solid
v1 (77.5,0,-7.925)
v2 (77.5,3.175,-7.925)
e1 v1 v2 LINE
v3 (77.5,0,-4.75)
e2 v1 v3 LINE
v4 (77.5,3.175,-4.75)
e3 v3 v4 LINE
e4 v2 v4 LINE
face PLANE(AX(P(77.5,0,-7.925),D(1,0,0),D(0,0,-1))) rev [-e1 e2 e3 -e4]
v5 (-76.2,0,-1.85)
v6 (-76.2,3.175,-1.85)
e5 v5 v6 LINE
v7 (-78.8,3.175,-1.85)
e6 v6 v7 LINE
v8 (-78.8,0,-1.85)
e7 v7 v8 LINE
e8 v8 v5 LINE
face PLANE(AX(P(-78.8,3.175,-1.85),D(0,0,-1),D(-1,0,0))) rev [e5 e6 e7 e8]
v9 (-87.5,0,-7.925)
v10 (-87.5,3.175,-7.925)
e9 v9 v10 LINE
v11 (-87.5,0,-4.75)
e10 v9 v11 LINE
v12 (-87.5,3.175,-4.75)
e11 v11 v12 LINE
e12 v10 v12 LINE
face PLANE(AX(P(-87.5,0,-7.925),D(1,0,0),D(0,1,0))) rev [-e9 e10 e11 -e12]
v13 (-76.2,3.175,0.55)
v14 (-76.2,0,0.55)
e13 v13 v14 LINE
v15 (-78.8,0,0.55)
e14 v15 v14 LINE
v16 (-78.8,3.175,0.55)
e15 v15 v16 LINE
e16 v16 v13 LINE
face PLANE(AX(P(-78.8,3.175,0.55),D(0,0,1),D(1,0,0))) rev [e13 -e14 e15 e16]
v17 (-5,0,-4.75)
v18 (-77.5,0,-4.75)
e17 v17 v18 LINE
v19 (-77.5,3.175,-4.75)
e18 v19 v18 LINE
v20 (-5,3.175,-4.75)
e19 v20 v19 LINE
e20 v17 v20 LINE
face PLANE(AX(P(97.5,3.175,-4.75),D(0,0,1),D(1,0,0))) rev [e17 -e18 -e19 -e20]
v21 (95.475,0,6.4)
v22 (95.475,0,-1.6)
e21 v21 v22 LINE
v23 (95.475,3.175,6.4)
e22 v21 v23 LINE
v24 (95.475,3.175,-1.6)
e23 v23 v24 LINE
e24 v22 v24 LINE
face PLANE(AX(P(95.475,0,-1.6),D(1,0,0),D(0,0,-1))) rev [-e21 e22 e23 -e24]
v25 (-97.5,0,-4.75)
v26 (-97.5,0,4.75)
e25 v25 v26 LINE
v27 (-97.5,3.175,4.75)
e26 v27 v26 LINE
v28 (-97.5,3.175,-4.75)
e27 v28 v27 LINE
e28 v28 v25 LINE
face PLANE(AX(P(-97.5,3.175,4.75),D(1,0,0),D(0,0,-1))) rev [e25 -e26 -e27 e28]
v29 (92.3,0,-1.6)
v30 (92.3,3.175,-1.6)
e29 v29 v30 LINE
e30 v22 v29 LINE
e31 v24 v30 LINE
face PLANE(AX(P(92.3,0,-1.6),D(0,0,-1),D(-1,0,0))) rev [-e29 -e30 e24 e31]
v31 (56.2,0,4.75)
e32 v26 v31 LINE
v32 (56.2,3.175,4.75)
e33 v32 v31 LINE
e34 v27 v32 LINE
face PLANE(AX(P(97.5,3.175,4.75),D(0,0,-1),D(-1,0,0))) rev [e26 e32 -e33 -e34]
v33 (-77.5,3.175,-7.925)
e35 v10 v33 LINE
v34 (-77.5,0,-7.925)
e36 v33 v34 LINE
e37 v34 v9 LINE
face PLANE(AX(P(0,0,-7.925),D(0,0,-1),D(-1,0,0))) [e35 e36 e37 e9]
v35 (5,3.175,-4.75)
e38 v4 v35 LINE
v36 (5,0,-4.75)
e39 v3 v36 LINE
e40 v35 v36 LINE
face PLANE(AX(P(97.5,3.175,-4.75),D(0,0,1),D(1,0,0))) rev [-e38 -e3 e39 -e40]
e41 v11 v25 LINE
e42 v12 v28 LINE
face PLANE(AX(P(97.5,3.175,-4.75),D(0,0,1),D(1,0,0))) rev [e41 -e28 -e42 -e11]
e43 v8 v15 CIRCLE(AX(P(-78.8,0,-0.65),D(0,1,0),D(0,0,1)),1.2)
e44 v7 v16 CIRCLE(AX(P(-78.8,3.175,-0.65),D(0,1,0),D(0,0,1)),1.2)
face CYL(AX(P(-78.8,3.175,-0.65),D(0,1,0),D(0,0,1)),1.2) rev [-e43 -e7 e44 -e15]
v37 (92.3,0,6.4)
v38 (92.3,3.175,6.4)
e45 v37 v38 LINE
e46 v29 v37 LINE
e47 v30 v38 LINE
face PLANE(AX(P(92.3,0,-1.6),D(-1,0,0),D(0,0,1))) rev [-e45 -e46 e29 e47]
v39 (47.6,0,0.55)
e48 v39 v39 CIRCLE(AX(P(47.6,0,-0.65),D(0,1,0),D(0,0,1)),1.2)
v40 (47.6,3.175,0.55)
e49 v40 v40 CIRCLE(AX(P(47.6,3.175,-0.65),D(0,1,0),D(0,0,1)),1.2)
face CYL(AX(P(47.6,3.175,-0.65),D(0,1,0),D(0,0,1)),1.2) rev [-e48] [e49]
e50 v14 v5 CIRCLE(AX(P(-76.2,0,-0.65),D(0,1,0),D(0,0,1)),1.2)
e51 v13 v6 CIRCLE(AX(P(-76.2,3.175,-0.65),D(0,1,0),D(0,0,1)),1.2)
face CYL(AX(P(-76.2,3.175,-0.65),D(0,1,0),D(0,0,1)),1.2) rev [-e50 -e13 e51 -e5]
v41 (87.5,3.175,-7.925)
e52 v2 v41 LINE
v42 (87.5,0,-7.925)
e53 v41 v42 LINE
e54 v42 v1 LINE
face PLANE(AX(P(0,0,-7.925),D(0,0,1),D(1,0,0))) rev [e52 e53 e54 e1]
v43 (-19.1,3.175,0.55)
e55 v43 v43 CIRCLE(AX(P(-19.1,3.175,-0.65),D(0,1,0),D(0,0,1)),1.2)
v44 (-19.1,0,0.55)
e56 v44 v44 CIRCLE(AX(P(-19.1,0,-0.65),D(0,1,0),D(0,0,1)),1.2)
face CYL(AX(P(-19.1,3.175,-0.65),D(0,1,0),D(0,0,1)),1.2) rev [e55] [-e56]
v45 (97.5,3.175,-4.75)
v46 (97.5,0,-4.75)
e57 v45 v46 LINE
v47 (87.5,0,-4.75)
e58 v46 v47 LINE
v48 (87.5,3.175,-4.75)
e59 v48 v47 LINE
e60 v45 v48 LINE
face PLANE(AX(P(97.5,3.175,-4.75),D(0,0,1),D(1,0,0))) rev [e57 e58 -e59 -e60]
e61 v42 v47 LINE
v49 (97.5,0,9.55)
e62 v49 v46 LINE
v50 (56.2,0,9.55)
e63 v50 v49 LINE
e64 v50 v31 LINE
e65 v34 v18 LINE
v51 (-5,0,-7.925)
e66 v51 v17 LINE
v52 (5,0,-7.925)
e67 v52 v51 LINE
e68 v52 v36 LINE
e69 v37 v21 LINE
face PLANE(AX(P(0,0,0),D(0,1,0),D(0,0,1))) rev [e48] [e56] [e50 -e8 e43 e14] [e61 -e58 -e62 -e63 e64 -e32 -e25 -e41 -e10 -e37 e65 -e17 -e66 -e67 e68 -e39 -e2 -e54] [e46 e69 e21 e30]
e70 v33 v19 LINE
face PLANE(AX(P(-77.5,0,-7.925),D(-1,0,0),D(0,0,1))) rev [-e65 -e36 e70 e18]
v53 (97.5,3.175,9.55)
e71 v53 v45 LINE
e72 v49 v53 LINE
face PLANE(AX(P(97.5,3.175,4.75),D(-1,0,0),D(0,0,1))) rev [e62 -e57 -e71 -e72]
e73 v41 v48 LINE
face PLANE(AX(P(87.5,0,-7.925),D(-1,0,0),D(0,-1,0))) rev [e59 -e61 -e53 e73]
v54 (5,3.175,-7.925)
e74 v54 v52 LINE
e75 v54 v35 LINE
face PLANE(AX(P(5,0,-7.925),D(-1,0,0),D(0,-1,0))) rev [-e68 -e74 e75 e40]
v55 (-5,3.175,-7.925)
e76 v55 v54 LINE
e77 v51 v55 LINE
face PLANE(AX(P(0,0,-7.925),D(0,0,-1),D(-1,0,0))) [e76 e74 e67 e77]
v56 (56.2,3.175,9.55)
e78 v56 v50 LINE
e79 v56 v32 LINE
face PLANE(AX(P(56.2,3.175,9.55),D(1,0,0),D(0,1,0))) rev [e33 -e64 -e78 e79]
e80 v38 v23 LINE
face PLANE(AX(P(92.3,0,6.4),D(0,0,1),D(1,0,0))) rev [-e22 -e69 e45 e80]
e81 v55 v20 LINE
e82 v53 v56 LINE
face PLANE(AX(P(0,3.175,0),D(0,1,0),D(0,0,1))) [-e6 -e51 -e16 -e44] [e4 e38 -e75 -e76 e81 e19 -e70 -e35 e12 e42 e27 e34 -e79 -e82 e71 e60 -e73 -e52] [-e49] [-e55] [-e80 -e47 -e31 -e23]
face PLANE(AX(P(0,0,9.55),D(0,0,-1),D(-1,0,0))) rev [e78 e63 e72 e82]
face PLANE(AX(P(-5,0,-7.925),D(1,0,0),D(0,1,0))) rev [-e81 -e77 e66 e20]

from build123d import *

# Parameters (mm, degrees)
SKETCH1_W                = 195
SKETCH1_H                = 9.5
BOSS_EXTRUDE1_DEPTH      = 3.175
M2_CLEARANCE_HOLE1_D     = 2.4
SKETCH5_W                = 10
SKETCH5_H                = 3.175
BOSS_EXTRUDE2_DEPTH      = 3.175
SKETCH6_W                = 41.3
SKETCH6_H                = 3.175
BOSS_EXTRUDE3_DEPTH      = 4.8
SKETCH7_W                = 3.175
SKETCH7_H                = 8
CUT_EXTRUDE1_DEPTH       = 99.01802449
M2_CLEARANCE_SLOT1_DEPTH = 3.175


# Read off the part's stored shape, not the designer's step: M2 Clearance Slot1
with BuildPart() as part:
    # Sketch1 → Boss-Extrude1 (new body)
    with BuildSketch(Plane(origin=(0, 0, 0), x_dir=(1, 0, 0), z_dir=(0, 1, 0))):
        Rectangle(SKETCH1_W, SKETCH1_H)
    extrude(amount=BOSS_EXTRUDE1_DEPTH)

    # M2 Clearance Hole1 (through all)
    with Locations(Plane(origin=(0, 3.175, 0), x_dir=(1, 0, 0), z_dir=(0, 1, 0))):
        with Locations((-77.5, 0.65), (47.6, 0.65), (-19.1, 0.65)):
            Hole(M2_CLEARANCE_HOLE1_D / 2)

    # Sketch5 → Boss-Extrude2 (add)
    with BuildSketch(Plane(origin=(0, 0, -4.75), x_dir=(-1, 0, 0), z_dir=(0, 0, -1))):
        with Locations((82.5, 1.5875)):
            Rectangle(SKETCH5_W, SKETCH5_H)
        with Locations((-82.5, 1.5875)):
            Rectangle(SKETCH5_W, SKETCH5_H)
        with Locations((0, 1.5875)):
            Rectangle(SKETCH5_W, SKETCH5_H)
    extrude(amount=BOSS_EXTRUDE2_DEPTH)

    # Sketch6 → Boss-Extrude3 (add)
    with BuildSketch(Plane.XY.offset(4.75)):
        with Locations((76.85, 1.5875)):
            Rectangle(SKETCH6_W, SKETCH6_H)
    extrude(amount=BOSS_EXTRUDE3_DEPTH)

    # Sketch7 → Cut-Extrude1 (cut, through all)
    with BuildSketch(Plane(origin=(0, 3.175, 0), x_dir=(1, 0, 0), z_dir=(0, 1, 0))):
        with Locations((93.8875, -2.4)):
            Rectangle(SKETCH7_W, SKETCH7_H)
    extrude(amount=-CUT_EXTRUDE1_DEPTH, mode=Mode.SUBTRACT)

    # M2 Clearance Slot1 outline → M2 Clearance Slot1 (cut)
    with BuildSketch(Plane(origin=(0, 0, 0), x_dir=(1, 0, 0), z_dir=(0, 1, 0))):
        with BuildLine():
            ThreePointArc((-78.8, 1.85), (-80, 0.65), (-78.8, -0.55))
            Line((-78.8, -0.55), (-77.5, -0.55))
            ThreePointArc((-77.5, -0.55), (-78.7, 0.65), (-77.5, 1.85))
            Line((-77.5, 1.85), (-78.8, 1.85))
        make_face()
        with BuildLine():
            ThreePointArc((-77.5, 1.85), (-76.3, 0.65), (-77.5, -0.55))
            Line((-77.5, -0.55), (-76.2, -0.55))
            ThreePointArc((-76.2, -0.55), (-75, 0.65), (-76.2, 1.85))
            Line((-76.2, 1.85), (-77.5, 1.85))
        make_face()
    extrude(amount=M2_CLEARANCE_SLOT1_DEPTH, mode=Mode.SUBTRACT)


solid = part.part
